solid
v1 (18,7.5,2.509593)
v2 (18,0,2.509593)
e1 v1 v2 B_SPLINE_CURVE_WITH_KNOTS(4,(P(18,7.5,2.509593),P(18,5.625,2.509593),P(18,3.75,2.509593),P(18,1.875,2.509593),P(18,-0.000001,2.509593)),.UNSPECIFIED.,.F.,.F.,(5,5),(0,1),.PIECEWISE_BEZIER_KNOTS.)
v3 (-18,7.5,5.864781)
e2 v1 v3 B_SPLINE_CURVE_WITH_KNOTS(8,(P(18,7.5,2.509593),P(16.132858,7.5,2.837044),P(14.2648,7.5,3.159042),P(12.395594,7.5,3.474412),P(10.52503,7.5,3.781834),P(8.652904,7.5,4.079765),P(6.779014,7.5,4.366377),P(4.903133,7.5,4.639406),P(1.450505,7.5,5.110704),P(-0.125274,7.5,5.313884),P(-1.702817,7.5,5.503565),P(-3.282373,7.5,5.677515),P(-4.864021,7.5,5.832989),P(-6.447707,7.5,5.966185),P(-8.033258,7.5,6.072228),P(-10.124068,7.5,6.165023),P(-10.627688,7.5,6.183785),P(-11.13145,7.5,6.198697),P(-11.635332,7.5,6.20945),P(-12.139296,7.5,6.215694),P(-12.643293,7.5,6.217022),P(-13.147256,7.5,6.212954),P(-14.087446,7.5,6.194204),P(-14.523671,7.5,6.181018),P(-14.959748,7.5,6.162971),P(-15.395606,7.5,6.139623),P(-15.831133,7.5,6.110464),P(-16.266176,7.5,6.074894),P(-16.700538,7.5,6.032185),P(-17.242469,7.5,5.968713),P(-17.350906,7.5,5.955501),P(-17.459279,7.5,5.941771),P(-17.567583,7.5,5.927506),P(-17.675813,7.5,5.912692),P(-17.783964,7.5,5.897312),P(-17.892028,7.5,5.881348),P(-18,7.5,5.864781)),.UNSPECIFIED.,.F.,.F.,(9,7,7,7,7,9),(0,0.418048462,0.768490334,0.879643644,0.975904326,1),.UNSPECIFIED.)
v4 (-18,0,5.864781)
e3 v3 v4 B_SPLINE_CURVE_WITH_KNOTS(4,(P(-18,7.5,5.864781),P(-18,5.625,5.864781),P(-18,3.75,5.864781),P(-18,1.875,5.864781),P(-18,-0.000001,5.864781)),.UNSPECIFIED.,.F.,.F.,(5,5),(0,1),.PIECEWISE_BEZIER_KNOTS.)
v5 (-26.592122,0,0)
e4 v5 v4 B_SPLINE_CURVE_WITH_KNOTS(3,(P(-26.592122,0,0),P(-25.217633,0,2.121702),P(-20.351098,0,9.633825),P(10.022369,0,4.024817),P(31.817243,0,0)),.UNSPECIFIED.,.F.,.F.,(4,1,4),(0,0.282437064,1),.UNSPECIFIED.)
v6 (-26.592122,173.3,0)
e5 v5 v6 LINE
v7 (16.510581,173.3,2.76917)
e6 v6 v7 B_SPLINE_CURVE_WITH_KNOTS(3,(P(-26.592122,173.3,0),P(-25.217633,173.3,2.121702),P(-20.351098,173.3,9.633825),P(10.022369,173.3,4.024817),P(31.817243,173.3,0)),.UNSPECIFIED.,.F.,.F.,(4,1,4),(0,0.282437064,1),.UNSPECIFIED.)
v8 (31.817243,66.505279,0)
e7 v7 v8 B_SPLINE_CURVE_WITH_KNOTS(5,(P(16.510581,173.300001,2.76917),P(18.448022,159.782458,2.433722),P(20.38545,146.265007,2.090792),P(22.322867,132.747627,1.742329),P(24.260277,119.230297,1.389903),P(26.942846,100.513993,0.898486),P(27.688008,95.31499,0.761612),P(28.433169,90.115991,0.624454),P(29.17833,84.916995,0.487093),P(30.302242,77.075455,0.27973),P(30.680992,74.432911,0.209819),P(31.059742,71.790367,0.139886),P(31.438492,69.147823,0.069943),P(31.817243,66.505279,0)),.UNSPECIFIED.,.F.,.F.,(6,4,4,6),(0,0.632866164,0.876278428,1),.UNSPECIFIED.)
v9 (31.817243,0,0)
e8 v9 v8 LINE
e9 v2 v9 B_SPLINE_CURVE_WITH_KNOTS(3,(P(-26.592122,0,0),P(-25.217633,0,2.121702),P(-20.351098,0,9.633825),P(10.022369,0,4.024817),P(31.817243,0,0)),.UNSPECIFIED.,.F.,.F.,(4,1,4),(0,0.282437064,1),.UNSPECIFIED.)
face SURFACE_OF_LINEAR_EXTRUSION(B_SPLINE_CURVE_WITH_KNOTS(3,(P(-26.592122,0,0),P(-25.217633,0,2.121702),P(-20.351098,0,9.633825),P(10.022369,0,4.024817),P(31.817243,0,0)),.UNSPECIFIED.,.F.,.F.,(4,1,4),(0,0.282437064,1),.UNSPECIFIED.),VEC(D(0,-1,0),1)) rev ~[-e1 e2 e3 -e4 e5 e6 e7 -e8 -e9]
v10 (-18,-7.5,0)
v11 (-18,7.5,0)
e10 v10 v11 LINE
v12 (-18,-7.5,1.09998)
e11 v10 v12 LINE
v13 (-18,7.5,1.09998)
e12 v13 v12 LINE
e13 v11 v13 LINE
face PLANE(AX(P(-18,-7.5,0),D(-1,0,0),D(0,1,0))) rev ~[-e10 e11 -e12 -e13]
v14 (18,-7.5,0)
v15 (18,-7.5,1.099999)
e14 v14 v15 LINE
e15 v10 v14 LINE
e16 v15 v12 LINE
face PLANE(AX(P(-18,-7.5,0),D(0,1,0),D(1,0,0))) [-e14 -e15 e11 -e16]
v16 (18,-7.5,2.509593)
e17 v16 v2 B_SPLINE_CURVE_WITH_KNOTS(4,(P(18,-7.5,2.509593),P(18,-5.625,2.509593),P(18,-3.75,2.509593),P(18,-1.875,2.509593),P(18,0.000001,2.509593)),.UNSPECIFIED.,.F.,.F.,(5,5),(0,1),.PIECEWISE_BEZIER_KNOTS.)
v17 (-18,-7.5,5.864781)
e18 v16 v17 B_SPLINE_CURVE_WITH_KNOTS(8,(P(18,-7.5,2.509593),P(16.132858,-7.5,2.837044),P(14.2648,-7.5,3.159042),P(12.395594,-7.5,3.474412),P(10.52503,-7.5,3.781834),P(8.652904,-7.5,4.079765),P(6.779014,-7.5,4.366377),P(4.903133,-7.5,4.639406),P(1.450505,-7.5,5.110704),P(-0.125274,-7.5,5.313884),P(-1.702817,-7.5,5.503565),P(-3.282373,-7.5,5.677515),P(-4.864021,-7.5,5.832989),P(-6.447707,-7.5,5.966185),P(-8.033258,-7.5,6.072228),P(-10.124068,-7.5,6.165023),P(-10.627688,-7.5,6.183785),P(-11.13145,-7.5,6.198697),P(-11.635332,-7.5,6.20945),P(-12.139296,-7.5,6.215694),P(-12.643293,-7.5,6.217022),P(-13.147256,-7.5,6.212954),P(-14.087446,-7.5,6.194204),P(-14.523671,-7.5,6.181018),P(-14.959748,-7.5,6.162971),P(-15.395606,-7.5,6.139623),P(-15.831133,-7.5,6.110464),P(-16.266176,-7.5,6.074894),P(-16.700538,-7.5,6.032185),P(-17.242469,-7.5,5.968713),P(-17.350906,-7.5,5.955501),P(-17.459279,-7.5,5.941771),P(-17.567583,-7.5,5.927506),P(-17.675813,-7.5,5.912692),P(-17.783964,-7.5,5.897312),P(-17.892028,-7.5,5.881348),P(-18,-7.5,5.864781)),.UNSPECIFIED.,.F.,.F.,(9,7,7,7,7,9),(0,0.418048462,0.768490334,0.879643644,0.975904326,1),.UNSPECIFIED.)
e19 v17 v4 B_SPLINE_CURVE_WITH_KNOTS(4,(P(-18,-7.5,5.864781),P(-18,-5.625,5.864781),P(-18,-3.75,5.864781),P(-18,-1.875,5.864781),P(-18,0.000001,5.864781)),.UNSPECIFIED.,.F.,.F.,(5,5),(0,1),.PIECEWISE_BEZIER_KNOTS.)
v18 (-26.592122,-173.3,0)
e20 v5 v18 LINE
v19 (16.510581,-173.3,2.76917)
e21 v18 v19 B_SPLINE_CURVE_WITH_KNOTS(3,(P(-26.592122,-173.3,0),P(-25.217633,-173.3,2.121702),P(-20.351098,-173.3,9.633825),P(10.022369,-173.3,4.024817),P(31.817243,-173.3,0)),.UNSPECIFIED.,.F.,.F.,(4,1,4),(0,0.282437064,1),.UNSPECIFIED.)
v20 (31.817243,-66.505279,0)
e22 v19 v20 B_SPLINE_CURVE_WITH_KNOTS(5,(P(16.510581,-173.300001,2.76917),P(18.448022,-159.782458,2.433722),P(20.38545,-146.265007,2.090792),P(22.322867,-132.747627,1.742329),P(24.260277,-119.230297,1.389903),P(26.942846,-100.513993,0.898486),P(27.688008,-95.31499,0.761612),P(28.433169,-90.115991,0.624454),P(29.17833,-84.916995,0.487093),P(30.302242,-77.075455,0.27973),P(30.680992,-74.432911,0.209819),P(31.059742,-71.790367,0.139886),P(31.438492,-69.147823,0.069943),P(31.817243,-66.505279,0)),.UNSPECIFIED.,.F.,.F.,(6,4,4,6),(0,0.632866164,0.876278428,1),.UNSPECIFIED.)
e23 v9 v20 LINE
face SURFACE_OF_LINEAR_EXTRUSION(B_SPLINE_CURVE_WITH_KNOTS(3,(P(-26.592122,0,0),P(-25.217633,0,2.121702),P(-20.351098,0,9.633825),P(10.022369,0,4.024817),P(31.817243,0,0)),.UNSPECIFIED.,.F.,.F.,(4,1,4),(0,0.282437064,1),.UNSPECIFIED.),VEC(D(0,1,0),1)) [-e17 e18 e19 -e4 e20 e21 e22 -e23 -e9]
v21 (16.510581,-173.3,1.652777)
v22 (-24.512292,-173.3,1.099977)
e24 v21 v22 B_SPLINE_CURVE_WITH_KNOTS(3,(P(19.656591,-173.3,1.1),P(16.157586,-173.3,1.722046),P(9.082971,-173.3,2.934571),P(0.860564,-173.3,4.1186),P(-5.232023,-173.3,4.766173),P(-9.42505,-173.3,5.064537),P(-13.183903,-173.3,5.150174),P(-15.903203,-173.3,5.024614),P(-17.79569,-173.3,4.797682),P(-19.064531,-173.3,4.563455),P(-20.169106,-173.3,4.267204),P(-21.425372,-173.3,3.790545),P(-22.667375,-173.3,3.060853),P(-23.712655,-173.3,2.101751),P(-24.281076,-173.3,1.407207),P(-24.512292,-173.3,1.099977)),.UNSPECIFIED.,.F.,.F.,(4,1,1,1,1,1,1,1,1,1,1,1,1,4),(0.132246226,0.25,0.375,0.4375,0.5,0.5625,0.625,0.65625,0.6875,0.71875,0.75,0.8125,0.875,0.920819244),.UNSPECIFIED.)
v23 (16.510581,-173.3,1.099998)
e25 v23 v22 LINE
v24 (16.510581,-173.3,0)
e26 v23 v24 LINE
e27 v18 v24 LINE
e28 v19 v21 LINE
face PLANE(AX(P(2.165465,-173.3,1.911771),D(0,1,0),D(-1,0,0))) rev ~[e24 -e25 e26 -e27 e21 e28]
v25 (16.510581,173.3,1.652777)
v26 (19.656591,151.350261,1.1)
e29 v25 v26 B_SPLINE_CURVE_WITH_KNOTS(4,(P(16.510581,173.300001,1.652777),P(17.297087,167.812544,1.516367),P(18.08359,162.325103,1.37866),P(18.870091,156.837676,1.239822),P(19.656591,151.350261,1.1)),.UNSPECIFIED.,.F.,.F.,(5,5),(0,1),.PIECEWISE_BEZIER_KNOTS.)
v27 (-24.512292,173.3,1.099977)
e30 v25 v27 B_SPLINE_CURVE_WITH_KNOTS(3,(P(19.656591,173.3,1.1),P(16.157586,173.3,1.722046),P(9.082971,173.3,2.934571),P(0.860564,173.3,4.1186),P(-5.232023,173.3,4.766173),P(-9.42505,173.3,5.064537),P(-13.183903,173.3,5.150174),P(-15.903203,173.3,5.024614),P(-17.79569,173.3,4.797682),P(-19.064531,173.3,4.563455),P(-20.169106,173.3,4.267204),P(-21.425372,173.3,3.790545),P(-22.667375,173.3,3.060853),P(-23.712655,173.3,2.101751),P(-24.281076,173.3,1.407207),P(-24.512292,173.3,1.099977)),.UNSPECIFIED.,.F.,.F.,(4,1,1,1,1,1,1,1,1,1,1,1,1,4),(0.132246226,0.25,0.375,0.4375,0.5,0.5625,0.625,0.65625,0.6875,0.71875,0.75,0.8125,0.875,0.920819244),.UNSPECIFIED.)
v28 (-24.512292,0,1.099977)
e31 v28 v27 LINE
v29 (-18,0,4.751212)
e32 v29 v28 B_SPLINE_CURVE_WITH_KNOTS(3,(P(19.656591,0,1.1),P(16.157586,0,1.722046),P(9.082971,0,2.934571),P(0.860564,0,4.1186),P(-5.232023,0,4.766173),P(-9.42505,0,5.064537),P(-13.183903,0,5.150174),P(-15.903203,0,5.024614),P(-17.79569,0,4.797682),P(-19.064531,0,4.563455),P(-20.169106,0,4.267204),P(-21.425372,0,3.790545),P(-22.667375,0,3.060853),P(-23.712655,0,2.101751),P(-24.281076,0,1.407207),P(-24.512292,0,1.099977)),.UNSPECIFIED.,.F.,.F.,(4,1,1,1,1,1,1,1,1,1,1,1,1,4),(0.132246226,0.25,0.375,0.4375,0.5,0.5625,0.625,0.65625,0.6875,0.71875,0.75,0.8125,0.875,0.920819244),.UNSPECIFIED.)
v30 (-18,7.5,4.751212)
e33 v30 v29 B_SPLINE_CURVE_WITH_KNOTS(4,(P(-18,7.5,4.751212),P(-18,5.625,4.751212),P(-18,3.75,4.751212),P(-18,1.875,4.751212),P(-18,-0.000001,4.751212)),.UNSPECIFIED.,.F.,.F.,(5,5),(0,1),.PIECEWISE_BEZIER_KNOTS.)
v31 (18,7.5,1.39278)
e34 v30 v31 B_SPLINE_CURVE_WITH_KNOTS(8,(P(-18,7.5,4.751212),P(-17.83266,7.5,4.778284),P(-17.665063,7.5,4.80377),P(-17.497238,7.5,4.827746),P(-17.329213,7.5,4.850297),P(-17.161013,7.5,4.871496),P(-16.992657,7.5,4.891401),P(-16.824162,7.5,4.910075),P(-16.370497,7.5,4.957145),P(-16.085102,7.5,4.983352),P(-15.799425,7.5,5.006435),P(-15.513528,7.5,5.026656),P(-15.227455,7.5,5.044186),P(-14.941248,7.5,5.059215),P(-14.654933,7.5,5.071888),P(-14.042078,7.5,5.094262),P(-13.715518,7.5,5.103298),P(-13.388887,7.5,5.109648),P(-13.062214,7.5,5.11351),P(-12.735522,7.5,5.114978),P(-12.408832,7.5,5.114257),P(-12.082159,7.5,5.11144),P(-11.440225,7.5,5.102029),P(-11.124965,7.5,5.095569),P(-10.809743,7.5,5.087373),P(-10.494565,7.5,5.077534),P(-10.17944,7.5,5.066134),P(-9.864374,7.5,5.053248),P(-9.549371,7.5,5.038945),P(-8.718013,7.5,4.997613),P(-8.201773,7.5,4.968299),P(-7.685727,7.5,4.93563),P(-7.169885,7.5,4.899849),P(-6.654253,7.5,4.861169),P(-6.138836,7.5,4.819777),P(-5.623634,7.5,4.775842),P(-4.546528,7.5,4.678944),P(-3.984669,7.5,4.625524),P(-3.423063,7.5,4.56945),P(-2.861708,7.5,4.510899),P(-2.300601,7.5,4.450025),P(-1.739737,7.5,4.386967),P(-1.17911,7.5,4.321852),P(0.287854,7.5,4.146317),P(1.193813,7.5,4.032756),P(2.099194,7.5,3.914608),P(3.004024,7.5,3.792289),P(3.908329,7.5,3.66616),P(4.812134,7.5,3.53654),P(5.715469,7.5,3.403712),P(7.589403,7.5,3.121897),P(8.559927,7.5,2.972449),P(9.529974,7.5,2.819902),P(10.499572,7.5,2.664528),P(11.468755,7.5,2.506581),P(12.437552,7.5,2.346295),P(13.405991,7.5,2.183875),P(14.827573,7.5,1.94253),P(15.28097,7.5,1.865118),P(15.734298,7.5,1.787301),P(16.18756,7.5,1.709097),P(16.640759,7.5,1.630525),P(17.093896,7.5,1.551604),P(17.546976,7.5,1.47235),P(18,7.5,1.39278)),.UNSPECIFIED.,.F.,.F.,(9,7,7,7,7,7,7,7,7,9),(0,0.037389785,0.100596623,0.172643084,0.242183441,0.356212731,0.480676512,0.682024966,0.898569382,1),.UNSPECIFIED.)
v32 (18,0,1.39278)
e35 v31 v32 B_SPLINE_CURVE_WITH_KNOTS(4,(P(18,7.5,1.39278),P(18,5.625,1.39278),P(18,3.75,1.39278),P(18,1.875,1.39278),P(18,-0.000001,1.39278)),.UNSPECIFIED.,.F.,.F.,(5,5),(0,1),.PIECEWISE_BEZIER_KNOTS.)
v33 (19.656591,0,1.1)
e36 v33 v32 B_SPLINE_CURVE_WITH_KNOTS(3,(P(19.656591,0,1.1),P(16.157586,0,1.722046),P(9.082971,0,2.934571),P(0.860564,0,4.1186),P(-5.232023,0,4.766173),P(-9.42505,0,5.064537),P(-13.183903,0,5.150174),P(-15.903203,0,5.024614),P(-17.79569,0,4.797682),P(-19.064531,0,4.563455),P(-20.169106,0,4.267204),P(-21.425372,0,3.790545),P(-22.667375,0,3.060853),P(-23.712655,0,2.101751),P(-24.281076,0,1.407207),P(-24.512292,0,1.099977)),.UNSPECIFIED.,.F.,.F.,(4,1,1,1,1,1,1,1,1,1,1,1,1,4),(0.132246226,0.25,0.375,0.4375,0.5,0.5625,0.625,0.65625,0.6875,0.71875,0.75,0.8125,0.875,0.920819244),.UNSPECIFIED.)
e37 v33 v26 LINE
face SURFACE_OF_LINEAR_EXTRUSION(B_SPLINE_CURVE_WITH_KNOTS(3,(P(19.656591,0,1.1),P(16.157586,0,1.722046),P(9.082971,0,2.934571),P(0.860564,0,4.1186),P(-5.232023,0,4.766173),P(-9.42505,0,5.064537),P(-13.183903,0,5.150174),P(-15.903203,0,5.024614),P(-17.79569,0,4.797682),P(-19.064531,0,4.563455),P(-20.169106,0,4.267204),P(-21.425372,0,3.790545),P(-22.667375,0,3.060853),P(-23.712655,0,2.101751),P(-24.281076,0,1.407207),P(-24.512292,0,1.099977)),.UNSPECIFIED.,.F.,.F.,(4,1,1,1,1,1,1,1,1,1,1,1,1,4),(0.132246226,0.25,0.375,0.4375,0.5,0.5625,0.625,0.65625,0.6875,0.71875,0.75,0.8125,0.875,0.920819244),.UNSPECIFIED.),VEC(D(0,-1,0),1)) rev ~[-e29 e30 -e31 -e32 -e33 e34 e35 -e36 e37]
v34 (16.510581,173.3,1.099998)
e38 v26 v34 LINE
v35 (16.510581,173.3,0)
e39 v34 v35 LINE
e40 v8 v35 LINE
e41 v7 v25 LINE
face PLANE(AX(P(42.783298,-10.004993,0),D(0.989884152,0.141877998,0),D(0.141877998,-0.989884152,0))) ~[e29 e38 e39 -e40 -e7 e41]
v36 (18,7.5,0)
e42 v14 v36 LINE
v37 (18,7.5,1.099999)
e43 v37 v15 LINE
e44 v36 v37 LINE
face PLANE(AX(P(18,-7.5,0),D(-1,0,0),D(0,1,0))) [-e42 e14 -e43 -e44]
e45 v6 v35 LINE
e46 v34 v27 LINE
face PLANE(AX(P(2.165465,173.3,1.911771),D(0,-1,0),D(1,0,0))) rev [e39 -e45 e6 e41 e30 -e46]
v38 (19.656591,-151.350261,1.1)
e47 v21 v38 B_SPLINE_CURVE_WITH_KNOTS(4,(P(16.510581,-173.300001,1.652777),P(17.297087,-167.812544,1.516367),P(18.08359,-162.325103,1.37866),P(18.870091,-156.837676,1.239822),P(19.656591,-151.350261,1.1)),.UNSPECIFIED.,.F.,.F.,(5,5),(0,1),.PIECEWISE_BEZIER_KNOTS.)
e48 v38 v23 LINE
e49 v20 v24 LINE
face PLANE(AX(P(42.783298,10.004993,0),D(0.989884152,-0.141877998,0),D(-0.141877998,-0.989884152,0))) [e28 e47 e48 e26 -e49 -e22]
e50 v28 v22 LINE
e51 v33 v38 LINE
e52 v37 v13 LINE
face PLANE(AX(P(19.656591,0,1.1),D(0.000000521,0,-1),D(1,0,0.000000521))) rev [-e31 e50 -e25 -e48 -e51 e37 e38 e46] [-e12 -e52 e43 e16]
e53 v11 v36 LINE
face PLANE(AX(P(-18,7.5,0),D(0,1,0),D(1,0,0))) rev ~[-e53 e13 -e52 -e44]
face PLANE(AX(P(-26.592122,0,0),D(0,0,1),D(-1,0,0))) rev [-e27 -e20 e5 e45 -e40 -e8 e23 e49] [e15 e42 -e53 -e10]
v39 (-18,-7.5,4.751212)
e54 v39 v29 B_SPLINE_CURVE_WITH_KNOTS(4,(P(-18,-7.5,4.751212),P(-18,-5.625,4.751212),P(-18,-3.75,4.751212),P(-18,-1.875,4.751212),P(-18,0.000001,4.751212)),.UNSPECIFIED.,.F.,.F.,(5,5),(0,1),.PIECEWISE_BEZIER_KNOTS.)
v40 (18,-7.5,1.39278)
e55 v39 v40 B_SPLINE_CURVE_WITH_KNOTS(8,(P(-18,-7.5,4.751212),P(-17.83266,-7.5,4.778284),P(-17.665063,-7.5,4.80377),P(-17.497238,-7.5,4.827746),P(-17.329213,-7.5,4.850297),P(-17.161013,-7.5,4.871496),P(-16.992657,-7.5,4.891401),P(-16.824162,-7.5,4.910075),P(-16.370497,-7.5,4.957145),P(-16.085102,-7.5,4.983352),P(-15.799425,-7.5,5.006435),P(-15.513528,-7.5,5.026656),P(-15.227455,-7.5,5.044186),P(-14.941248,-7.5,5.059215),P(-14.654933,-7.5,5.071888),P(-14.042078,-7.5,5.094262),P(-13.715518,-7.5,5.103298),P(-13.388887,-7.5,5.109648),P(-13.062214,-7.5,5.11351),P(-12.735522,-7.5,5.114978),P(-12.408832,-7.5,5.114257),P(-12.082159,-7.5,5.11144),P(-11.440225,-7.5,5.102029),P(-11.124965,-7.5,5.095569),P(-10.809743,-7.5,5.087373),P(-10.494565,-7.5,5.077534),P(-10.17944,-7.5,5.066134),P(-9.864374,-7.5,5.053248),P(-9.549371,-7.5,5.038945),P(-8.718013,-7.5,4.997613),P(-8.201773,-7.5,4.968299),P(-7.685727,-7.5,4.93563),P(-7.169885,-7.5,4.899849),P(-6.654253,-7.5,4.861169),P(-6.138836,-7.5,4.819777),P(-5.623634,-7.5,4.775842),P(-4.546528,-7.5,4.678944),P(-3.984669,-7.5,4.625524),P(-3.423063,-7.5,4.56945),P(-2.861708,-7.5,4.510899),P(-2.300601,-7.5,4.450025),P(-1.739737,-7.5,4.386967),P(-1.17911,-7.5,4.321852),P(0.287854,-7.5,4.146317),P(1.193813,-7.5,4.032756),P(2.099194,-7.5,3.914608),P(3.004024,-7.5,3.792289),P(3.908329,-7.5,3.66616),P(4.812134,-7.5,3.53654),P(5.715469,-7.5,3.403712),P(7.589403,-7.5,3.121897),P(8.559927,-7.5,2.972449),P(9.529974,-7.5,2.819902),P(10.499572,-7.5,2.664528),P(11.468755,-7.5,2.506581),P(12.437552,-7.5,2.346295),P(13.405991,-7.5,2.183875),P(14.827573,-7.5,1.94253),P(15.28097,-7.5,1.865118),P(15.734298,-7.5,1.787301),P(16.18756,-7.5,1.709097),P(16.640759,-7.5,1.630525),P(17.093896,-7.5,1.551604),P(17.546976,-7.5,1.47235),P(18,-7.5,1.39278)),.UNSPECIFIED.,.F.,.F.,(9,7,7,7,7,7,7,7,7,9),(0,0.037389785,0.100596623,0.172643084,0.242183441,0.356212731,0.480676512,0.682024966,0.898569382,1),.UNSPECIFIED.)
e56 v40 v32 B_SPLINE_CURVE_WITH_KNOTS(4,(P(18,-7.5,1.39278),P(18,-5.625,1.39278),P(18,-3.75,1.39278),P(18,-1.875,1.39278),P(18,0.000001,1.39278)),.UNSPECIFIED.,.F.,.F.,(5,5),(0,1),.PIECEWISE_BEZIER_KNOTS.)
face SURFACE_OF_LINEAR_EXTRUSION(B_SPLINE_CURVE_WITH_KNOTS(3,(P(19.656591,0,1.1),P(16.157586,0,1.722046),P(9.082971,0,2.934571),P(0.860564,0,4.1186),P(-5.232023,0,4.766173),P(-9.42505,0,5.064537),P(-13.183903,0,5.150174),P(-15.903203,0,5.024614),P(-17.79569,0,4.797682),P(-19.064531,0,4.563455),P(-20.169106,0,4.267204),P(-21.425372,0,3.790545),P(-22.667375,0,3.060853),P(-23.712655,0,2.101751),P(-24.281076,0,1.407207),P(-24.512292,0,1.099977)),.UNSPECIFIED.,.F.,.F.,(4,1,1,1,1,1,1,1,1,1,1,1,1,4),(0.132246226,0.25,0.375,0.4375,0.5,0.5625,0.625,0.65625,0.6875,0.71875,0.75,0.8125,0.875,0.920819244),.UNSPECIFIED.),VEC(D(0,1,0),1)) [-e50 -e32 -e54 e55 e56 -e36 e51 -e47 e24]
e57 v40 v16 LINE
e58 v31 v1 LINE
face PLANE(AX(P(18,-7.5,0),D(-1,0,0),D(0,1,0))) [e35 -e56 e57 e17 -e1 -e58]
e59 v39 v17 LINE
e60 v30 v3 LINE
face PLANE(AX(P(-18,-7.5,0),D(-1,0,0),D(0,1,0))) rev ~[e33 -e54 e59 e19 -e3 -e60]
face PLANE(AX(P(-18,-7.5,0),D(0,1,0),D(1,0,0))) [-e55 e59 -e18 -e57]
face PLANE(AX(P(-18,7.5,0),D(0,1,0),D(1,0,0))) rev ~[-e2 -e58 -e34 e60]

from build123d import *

# Parameters (mm, degrees)
F2_DEPTH = 173.3
F4_DEPTH = 25
F6_W     = 36
F6_H     = 15
F7_DEPTH = 20


# Not quite as in the source:
# - ends of sketch curves that miss each other by under 0.0002 mm in the source are joined
# - the dataset's text gives a spline's control points without its knots; the knots are read off the source's solid


with BuildPart() as f2:
    # F1 (on face) → F2 (new body)
    with BuildSketch(Plane.XZ):
        with BuildLine():
            add(Edge.make_bspline(
                [(-26.5921223909, 0), (-25.2176326426, 2.1217019965), (-20.3510980326, 9.6338251033), (10.0223686099, 4.0248166048), (31.8172425032, 0)],
                knots=[0, 0, 0, 0, 0.2824370642, 1, 1, 1, 1], degree=3))
            Line((-26.5921223909, 0), (31.8172425032, 0))
        make_face()
        with BuildLine():
            add(Edge.make_bspline(
                [(19.6565909304, 1.0999999067), (16.1575857425, 1.7220457641), (9.0829705679, 2.9345711326), (0.8605637985, 4.1185996724), (-5.2320226887, 4.7661728451), (-9.4250497651, 5.0645366103), (-13.1839026492, 5.150174403), (-15.9032026434, 5.0246144265), (-17.7956903302, 4.7976821367), (-19.064531223, 4.5634552716), (-20.1691059627, 4.2672043663), (-21.4253720439, 3.7905449175), (-22.667375377, 3.0608525064), (-23.7126545919, 2.1017508626), (-24.2810764737, 1.407206711), (-24.5122916533, 1.0999768794)],
                knots=[0.1322462263, 0.1322462263, 0.1322462263, 0.1322462263, 0.25, 0.375, 0.4375, 0.5, 0.5625, 0.625, 0.65625, 0.6875, 0.71875, 0.75, 0.8125, 0.875, 0.9208192438, 0.9208192438, 0.9208192438, 0.9208192438], degree=3))
            Line((19.6565909304, 1.0999999067), (-24.5122916533, 1.0999768794))
        make_face(mode=Mode.SUBTRACT)
    extrude(amount=F2_DEPTH)

    # F3 (on Top) → F4 (cut)
    with BuildSketch(Plane.XY):
        Polygon((65.3333365917, -177.500128746), (42.7832975984, 10.0049925968), (15.9085858613, -177.500128746), align=None)
    extrude(amount=F4_DEPTH, mode=Mode.SUBTRACT)

    # F5: F2 across plane


with BuildPart() as f2_1:
    add(f2.part)
    add(f2.part.mirror(Plane.XZ))

    # F6 (on Top) → F7 (cut)
    with BuildSketch(Plane.XY):
        Rectangle(F6_W, F6_H)
    extrude(amount=F7_DEPTH, mode=Mode.SUBTRACT)


solid = f2_1.part
